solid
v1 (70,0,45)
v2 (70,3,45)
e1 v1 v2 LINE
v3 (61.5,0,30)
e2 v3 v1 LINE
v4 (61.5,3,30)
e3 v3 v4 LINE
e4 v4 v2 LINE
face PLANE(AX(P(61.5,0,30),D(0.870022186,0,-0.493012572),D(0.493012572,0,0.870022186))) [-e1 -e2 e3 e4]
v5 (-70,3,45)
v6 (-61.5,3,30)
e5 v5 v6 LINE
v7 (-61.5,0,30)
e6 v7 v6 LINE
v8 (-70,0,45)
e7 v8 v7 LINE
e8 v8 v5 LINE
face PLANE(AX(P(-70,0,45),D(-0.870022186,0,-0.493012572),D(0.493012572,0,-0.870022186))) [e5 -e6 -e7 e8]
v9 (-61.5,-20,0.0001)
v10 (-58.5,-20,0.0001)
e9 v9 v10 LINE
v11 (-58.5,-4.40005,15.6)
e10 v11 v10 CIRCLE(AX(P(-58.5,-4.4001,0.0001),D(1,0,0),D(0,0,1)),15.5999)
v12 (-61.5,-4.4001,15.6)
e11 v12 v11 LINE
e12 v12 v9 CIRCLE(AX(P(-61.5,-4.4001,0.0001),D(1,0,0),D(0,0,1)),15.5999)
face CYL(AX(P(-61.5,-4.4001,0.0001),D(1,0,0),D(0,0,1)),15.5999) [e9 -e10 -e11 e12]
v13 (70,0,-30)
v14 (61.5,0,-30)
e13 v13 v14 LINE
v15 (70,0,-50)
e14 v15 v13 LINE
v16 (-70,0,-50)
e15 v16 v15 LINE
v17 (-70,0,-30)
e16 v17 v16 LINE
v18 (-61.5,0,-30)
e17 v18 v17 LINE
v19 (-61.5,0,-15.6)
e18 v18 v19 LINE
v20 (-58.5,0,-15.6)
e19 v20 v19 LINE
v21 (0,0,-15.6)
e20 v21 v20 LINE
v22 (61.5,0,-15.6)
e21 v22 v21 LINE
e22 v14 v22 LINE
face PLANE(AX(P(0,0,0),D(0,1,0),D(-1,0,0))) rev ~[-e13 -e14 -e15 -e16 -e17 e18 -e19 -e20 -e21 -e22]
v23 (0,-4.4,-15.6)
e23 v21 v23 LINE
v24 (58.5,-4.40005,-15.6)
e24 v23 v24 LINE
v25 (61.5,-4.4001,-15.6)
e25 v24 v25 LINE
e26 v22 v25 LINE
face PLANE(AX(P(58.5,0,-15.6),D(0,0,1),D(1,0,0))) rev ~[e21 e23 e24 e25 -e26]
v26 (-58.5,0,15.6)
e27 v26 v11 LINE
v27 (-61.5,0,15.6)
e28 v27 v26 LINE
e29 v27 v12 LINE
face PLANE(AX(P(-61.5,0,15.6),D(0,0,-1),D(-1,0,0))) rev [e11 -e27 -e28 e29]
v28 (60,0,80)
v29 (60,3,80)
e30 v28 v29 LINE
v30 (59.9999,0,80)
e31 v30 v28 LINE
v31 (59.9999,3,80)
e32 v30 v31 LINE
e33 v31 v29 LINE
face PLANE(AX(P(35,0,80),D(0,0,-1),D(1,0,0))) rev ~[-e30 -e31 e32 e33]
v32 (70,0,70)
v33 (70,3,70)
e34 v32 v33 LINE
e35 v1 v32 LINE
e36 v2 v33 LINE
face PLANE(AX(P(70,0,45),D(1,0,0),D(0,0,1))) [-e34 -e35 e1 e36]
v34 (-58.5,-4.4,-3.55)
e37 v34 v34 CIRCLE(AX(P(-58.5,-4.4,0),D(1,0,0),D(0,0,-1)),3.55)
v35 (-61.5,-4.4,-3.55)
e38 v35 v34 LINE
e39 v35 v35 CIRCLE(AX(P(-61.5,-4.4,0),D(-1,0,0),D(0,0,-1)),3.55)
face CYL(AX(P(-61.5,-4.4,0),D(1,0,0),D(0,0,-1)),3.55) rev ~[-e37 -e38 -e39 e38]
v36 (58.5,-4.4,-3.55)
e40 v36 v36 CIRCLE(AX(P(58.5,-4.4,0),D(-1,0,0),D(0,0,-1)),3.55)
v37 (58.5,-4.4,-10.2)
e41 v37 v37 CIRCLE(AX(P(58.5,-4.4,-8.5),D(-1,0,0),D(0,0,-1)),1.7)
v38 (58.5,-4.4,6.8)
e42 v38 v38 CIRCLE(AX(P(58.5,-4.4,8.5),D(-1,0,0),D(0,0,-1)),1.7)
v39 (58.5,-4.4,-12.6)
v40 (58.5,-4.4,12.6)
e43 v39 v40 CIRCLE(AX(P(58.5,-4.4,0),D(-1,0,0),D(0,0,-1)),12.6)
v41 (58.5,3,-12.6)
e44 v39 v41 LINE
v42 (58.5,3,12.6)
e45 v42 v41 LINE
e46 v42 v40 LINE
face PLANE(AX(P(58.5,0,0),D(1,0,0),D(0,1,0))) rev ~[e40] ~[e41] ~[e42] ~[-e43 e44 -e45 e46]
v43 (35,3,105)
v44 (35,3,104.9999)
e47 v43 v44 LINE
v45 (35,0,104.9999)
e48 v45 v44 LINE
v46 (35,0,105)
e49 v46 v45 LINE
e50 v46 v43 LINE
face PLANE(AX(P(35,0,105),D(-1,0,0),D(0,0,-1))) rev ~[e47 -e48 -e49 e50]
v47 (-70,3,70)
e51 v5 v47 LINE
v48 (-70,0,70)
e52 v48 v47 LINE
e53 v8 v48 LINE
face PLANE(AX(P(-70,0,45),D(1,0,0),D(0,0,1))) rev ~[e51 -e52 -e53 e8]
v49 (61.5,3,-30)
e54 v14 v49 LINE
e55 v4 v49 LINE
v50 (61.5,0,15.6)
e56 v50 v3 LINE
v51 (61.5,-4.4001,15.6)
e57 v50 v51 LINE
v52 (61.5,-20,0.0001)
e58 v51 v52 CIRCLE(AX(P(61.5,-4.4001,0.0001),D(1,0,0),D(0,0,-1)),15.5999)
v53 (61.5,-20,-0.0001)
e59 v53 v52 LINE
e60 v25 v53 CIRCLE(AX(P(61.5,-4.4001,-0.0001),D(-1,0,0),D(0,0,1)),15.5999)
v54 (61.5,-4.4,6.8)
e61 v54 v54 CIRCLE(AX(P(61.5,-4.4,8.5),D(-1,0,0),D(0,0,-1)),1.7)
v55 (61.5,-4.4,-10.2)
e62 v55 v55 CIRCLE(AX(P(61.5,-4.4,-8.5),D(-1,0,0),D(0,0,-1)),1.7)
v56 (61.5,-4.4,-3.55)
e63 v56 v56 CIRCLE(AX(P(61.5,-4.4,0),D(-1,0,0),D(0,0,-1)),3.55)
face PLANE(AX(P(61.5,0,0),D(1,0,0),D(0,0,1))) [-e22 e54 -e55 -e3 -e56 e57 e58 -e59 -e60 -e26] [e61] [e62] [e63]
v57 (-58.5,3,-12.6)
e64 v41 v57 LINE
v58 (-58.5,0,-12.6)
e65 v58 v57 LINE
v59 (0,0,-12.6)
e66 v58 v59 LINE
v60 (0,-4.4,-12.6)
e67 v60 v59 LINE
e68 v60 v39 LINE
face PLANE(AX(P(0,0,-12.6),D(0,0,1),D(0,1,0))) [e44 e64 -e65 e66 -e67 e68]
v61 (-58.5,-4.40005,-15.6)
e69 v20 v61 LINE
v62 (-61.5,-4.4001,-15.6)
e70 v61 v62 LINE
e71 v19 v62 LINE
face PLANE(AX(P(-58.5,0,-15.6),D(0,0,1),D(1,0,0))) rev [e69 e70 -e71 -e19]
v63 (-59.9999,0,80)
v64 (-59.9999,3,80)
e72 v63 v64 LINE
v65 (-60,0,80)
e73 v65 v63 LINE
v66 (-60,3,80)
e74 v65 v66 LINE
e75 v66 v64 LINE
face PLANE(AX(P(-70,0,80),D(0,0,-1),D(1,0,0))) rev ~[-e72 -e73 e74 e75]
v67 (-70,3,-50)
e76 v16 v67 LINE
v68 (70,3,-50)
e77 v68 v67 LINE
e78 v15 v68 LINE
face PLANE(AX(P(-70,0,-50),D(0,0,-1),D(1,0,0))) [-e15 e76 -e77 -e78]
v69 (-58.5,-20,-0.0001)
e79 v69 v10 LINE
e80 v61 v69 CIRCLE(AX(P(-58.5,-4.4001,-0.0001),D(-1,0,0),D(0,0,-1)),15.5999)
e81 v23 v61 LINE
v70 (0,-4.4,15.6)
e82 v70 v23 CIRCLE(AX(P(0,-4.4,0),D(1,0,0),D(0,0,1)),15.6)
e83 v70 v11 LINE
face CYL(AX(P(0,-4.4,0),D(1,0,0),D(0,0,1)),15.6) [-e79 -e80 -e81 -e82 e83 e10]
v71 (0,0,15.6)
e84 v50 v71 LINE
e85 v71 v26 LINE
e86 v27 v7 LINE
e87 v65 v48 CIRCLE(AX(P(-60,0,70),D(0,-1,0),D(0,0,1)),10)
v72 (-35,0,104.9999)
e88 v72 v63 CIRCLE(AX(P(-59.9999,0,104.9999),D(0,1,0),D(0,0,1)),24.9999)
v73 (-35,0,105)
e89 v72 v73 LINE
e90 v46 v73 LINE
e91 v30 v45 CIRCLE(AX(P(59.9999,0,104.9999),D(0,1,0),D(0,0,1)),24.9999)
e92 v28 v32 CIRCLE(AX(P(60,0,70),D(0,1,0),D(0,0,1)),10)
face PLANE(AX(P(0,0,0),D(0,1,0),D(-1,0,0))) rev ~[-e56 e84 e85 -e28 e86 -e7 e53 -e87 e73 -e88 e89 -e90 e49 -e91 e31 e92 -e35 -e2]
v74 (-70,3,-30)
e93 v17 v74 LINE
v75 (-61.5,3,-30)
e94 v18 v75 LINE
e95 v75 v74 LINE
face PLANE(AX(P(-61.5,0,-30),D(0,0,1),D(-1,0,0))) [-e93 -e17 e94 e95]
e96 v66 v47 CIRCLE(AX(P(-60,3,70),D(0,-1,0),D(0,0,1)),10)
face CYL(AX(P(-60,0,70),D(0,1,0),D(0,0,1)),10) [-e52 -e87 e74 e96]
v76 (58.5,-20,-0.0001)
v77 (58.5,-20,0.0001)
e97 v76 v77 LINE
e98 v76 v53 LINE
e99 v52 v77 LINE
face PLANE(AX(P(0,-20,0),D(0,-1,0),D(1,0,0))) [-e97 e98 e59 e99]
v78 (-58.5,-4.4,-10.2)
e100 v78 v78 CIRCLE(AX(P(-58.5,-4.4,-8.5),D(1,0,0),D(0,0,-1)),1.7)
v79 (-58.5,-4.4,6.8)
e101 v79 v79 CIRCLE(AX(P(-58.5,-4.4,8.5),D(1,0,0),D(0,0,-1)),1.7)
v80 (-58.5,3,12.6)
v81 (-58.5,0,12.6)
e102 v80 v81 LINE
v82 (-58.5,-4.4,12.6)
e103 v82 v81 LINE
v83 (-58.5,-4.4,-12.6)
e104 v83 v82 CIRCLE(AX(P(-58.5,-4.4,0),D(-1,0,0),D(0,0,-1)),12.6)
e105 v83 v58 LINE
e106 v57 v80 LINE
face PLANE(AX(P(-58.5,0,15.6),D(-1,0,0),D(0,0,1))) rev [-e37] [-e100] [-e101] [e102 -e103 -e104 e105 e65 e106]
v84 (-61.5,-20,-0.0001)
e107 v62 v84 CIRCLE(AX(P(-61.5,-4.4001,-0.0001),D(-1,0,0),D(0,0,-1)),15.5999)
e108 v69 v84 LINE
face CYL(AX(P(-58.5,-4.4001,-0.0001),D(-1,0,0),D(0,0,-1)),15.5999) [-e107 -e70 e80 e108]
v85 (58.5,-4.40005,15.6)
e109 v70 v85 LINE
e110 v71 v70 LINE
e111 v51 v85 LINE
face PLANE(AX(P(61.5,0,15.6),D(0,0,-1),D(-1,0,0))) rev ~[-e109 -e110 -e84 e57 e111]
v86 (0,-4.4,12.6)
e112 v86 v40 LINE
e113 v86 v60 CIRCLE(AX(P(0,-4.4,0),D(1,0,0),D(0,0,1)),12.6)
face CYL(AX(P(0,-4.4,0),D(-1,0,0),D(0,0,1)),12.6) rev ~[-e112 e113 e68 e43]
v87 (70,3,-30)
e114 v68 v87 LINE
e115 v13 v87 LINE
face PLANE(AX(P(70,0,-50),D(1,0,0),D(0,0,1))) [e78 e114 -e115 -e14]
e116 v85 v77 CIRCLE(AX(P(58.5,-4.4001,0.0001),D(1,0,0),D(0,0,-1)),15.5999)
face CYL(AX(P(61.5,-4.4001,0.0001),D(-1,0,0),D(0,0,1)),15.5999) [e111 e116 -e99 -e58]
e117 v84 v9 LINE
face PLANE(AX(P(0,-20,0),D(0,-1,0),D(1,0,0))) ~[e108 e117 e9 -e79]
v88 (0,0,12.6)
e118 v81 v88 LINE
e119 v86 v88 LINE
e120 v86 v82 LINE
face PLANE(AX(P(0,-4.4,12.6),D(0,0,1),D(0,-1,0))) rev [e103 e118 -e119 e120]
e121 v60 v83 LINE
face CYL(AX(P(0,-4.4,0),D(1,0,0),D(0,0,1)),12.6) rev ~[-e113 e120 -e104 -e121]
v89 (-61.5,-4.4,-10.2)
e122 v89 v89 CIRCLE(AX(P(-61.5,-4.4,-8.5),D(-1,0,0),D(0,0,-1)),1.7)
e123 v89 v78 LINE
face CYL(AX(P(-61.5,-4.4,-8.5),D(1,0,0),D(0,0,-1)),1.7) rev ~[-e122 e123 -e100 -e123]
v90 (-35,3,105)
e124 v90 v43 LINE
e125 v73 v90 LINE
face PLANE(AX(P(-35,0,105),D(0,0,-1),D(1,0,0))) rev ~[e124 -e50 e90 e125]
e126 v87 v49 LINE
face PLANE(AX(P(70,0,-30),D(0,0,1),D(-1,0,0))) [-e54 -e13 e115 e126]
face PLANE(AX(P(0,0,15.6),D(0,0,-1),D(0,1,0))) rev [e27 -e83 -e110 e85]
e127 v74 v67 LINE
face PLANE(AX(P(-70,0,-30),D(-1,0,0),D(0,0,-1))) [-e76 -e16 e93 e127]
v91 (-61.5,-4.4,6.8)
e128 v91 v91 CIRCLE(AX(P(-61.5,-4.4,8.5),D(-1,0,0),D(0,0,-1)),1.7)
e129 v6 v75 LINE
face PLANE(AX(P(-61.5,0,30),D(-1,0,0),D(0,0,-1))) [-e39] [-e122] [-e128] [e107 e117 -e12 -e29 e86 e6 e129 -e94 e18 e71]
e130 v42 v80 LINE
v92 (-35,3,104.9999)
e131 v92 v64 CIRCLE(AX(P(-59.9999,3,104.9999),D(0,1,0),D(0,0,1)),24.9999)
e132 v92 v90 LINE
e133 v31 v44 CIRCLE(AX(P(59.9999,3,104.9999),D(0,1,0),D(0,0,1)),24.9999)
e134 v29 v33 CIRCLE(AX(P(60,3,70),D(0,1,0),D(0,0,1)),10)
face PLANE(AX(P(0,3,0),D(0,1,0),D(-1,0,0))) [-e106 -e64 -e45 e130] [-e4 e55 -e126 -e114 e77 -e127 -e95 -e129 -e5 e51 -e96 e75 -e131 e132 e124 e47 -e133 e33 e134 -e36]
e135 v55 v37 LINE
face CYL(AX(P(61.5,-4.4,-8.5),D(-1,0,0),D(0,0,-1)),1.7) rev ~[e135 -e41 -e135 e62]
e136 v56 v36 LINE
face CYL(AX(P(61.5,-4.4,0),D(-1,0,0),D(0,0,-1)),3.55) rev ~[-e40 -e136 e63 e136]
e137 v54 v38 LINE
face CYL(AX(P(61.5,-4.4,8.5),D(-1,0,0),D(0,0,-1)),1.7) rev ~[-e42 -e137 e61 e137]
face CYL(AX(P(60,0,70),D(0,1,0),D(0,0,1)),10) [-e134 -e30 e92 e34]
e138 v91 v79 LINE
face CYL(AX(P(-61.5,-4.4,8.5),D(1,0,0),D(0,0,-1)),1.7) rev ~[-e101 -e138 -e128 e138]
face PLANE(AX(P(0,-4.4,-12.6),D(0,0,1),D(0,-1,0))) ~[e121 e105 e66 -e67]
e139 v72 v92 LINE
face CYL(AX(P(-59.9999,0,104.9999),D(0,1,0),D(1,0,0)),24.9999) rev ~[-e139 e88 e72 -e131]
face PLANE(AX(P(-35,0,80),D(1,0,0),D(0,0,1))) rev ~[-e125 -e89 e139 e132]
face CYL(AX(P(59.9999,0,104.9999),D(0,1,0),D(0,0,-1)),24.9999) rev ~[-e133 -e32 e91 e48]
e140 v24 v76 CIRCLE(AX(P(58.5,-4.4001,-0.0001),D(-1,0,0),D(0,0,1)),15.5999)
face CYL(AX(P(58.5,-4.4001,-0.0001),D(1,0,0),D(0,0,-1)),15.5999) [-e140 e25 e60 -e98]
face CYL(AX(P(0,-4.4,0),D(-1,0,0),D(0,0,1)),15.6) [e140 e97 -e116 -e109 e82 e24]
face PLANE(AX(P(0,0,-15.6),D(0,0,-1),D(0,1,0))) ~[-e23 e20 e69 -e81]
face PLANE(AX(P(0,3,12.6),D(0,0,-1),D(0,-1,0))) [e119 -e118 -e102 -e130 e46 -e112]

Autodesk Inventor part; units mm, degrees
ref_plane "YZ Plane" through (0, 0, 0) normal (1, 0, 0) x (0, 1, 0)
ref_plane "XZ Plane" through (0, 0, 0) normal (0, 1, 0) x (-1, 0, 0)
ref_plane "XY Plane" through (0, 0, 0) normal (0, 0, 1) x (1, 0, 0)
sketch "Sketch1" plane through (0, 0, 0) normal (0, 1, 0) x (-1, 0, 0)
  line L0 (70, 45) -> (61.5, 30)
  line L1 (61.5, 30) -> (61.5, -30)
  line L2 (61.5, -30) -> (70, -30)
  line L3 (70, -30) -> (70, -50)
  line L4 (70, -50) -> (-70, -50)
  line L5 (-70, -50) -> (-70, -30)
  line L6 (-70, -30) -> (-61.5, -30)
  line L7 (-61.5, -30) -> (-61.5, 30)
  line L8 (-61.5, 30) -> (-70, 45)
  line L9 (70, 45) -> (70, 80)
  line L10 (-70, 45) -> (-70, 80)
  line L11 (35, 105) -> (-35, 105)
  line L12 (-98, 0) -> (98, 0) projected
  line L13 (0, -81) -> (0, 136) projected
  line L14 (70, 80) -> (35, 80)
  line L15 (35, 80) -> (35, 105)
  line L16 (-35, 105) -> (-35, 80)
  line L17 (-35, 80) -> (-70, 80)
  point P0 (0, 0)
  dimension "d0" = 60
  dimension "d1" = 60
  dimension "d2" = 123
  dimension "d3" = 140
  dimension "d4" = 20
  dimension "d5" = 140
  dimension "d8" = 35
  dimension "d15" = 30
  dimension "d45" = 15
  dimension "d46" = 15
  dimension "d47" = 35
  dimension "d48" = 70
  dimension "d49" = 155
extrude "Extrusion1" add sketch "Sketch1" along normal blind 3
sketch "Sketch2" plane through (0, 0, 0) normal (0, -1, 0) x (1, 0, 0)
  line L0 (-98, 0) -> (98, 0) projected
  line L1 (0, 136) -> (0, -81) projected
  line L2 (61.5, 15.6) -> (58.5, 15.6)
  line L3 (58.5, 15.6) -> (58.5, -15.6)
  line L4 (58.5, -15.6) -> (61.5, -15.6)
  line L5 (61.5, -15.6) -> (61.5, 15.6)
  line L6 (61.5, 30) -> (61.5, -30) projected
  point P0 (0, 0)
  dimension "d18" = 3
  dimension "d19" = 31.2
extrude "Extrusion2" add sketch "Sketch2" along normal blind 20
sketch "Sketch3" plane through (61.5, 0, -30) normal (1, 0, 0) x (0, 0, -1)
  line L0 (-45.6, 0) -> (-45.6, -20) projected
  line L1 (-14.4, -20) -> (-45.6, -20) projected
  line L2 (-30, -24.6) -> (-30, 7.6) projected
  point P0 (-30, 0)
  point P1 (-38.5, -4.4)
  point P2 (-21.5, -4.4)
  dimension "d22" = 17
  dimension "d23" = 15.6
hole "Hole1" at (61.5, -4.4, 8.5) at (61.5, -4.4, -8.5) direction (-1, 0, 0) diameter 3.4 end through all clearance for "Countersunk Flat Head Screw ISO 2009/7046" size "M3" standard "ISO"
sketch "Sketch4" plane through (61.5, 0, -30) normal (1, 0, 0) x (0, 0, -1)
  line L0 (-30, -24.6) -> (-30, 7.6) projected
  circle A0 centre (-38.5, -4.4) radius 1.7 projected
  circle A1 centre (-21.5, -4.4) radius 1.7 projected
  line L1 (-38.5, -4.4) -> (-21.5, -4.4) construction
  point P0 (-30, 0)
  point P1 (-30, -4.4)
hole "Hole2" at (61.5, -4.4, 0) direction (-1, 0, 0) diameter 7.1 end through all
fillet "Fillet1" radius 15.6 2 edges at (60, -20, -15.6) (60, -20, 15.6)
sketch "Sketch5" plane through (0, 0, 0) normal (1, 0, 0) x (0, 1, 0)
  line L0 (-24, 0) -> (4, 0) projected
  circle A0 centre (-4.4, 0) radius 3.55 projected
  arc A1 (-4.4, 12.6) -> (-4.4, -12.6) centre (-4.4, 0) ccw
  arc A2 (-4.4, 15.6) -> (-4.4, -15.6) centre (-4.4, 0) ccw
  line L1 (0, -15.6) -> (-4.4, -15.6) projected
  line L2 (-4.4, -15.6) -> (0, -15.6)
  line L3 (0, 30) -> (0, 15.6) projected
  line L4 (0, 15.6) -> (-4.4, 15.6) projected
  line L5 (-4.4, 15.6) -> (0, 15.6)
  line L6 (0, -15.6) -> (0, 15.6) projected
  line L7 (0, 15.6) -> (0, -15.6)
  line L8 (-4.4, 12.6) -> (0, 12.6)
  line L9 (-4.4, -12.6) -> (0, -12.6)
  point P0 (0, 0)
  point P1 (0, -12.6)
  point P2 (0, 12.6)
  dimension "d39" = 25.2
  dimension "d40" = 3
extrude "Extrusion3" add sketch "Sketch5" along normal up to surface (58.5 mm away) contours A2 L4 L6 L8 A1 L0 | L0 A1 L9 L6 L1 A2
sketch "Sketch6" plane through (0, 0, 0) normal (1, 0, 0) x (0, 1, 0)
  line L0 (0, 42) -> (0, -42) projected
  line L1 (-5.88, 0) -> (4.48, 0) projected
  line L2 (3, 12.6) -> (0, 12.6)
  line L3 (0, 12.6) -> (0, -12.6)
  line L4 (0, -12.6) -> (3, -12.6)
  line L5 (3, -12.6) -> (3, 12.6)
  line L6 (0, -12.6) -> (-4.4, -12.6) projected
  line L7 (-4.4, 12.6) -> (0, 12.6) projected
  line L8 (3, -30) -> (3, 30) projected
  line L9 (0, -30) -> (0, 30) projected
  point P0 (0, 0)
  point P1 (0, 12.6)
  point P2 (0, -12.6)
extrude "Extrusion4" cut sketch "Sketch6" along normal mid plane 117
mirror "Mirror1" about plane through (0, 0, 0) normal (1, 0, 0) of "Hole1", "Hole2", "Extrusion2", "Fillet1", "Extrusion3"
fillet "Fillet2" radius 25 2 edges at (35, 1.5, 80) (-35, 1.5, 80)
fillet "Fillet3" radius 10 2 edges at (70, 1.5, 80) (-70, 1.5, 80)
properties part number "karoserie1"
